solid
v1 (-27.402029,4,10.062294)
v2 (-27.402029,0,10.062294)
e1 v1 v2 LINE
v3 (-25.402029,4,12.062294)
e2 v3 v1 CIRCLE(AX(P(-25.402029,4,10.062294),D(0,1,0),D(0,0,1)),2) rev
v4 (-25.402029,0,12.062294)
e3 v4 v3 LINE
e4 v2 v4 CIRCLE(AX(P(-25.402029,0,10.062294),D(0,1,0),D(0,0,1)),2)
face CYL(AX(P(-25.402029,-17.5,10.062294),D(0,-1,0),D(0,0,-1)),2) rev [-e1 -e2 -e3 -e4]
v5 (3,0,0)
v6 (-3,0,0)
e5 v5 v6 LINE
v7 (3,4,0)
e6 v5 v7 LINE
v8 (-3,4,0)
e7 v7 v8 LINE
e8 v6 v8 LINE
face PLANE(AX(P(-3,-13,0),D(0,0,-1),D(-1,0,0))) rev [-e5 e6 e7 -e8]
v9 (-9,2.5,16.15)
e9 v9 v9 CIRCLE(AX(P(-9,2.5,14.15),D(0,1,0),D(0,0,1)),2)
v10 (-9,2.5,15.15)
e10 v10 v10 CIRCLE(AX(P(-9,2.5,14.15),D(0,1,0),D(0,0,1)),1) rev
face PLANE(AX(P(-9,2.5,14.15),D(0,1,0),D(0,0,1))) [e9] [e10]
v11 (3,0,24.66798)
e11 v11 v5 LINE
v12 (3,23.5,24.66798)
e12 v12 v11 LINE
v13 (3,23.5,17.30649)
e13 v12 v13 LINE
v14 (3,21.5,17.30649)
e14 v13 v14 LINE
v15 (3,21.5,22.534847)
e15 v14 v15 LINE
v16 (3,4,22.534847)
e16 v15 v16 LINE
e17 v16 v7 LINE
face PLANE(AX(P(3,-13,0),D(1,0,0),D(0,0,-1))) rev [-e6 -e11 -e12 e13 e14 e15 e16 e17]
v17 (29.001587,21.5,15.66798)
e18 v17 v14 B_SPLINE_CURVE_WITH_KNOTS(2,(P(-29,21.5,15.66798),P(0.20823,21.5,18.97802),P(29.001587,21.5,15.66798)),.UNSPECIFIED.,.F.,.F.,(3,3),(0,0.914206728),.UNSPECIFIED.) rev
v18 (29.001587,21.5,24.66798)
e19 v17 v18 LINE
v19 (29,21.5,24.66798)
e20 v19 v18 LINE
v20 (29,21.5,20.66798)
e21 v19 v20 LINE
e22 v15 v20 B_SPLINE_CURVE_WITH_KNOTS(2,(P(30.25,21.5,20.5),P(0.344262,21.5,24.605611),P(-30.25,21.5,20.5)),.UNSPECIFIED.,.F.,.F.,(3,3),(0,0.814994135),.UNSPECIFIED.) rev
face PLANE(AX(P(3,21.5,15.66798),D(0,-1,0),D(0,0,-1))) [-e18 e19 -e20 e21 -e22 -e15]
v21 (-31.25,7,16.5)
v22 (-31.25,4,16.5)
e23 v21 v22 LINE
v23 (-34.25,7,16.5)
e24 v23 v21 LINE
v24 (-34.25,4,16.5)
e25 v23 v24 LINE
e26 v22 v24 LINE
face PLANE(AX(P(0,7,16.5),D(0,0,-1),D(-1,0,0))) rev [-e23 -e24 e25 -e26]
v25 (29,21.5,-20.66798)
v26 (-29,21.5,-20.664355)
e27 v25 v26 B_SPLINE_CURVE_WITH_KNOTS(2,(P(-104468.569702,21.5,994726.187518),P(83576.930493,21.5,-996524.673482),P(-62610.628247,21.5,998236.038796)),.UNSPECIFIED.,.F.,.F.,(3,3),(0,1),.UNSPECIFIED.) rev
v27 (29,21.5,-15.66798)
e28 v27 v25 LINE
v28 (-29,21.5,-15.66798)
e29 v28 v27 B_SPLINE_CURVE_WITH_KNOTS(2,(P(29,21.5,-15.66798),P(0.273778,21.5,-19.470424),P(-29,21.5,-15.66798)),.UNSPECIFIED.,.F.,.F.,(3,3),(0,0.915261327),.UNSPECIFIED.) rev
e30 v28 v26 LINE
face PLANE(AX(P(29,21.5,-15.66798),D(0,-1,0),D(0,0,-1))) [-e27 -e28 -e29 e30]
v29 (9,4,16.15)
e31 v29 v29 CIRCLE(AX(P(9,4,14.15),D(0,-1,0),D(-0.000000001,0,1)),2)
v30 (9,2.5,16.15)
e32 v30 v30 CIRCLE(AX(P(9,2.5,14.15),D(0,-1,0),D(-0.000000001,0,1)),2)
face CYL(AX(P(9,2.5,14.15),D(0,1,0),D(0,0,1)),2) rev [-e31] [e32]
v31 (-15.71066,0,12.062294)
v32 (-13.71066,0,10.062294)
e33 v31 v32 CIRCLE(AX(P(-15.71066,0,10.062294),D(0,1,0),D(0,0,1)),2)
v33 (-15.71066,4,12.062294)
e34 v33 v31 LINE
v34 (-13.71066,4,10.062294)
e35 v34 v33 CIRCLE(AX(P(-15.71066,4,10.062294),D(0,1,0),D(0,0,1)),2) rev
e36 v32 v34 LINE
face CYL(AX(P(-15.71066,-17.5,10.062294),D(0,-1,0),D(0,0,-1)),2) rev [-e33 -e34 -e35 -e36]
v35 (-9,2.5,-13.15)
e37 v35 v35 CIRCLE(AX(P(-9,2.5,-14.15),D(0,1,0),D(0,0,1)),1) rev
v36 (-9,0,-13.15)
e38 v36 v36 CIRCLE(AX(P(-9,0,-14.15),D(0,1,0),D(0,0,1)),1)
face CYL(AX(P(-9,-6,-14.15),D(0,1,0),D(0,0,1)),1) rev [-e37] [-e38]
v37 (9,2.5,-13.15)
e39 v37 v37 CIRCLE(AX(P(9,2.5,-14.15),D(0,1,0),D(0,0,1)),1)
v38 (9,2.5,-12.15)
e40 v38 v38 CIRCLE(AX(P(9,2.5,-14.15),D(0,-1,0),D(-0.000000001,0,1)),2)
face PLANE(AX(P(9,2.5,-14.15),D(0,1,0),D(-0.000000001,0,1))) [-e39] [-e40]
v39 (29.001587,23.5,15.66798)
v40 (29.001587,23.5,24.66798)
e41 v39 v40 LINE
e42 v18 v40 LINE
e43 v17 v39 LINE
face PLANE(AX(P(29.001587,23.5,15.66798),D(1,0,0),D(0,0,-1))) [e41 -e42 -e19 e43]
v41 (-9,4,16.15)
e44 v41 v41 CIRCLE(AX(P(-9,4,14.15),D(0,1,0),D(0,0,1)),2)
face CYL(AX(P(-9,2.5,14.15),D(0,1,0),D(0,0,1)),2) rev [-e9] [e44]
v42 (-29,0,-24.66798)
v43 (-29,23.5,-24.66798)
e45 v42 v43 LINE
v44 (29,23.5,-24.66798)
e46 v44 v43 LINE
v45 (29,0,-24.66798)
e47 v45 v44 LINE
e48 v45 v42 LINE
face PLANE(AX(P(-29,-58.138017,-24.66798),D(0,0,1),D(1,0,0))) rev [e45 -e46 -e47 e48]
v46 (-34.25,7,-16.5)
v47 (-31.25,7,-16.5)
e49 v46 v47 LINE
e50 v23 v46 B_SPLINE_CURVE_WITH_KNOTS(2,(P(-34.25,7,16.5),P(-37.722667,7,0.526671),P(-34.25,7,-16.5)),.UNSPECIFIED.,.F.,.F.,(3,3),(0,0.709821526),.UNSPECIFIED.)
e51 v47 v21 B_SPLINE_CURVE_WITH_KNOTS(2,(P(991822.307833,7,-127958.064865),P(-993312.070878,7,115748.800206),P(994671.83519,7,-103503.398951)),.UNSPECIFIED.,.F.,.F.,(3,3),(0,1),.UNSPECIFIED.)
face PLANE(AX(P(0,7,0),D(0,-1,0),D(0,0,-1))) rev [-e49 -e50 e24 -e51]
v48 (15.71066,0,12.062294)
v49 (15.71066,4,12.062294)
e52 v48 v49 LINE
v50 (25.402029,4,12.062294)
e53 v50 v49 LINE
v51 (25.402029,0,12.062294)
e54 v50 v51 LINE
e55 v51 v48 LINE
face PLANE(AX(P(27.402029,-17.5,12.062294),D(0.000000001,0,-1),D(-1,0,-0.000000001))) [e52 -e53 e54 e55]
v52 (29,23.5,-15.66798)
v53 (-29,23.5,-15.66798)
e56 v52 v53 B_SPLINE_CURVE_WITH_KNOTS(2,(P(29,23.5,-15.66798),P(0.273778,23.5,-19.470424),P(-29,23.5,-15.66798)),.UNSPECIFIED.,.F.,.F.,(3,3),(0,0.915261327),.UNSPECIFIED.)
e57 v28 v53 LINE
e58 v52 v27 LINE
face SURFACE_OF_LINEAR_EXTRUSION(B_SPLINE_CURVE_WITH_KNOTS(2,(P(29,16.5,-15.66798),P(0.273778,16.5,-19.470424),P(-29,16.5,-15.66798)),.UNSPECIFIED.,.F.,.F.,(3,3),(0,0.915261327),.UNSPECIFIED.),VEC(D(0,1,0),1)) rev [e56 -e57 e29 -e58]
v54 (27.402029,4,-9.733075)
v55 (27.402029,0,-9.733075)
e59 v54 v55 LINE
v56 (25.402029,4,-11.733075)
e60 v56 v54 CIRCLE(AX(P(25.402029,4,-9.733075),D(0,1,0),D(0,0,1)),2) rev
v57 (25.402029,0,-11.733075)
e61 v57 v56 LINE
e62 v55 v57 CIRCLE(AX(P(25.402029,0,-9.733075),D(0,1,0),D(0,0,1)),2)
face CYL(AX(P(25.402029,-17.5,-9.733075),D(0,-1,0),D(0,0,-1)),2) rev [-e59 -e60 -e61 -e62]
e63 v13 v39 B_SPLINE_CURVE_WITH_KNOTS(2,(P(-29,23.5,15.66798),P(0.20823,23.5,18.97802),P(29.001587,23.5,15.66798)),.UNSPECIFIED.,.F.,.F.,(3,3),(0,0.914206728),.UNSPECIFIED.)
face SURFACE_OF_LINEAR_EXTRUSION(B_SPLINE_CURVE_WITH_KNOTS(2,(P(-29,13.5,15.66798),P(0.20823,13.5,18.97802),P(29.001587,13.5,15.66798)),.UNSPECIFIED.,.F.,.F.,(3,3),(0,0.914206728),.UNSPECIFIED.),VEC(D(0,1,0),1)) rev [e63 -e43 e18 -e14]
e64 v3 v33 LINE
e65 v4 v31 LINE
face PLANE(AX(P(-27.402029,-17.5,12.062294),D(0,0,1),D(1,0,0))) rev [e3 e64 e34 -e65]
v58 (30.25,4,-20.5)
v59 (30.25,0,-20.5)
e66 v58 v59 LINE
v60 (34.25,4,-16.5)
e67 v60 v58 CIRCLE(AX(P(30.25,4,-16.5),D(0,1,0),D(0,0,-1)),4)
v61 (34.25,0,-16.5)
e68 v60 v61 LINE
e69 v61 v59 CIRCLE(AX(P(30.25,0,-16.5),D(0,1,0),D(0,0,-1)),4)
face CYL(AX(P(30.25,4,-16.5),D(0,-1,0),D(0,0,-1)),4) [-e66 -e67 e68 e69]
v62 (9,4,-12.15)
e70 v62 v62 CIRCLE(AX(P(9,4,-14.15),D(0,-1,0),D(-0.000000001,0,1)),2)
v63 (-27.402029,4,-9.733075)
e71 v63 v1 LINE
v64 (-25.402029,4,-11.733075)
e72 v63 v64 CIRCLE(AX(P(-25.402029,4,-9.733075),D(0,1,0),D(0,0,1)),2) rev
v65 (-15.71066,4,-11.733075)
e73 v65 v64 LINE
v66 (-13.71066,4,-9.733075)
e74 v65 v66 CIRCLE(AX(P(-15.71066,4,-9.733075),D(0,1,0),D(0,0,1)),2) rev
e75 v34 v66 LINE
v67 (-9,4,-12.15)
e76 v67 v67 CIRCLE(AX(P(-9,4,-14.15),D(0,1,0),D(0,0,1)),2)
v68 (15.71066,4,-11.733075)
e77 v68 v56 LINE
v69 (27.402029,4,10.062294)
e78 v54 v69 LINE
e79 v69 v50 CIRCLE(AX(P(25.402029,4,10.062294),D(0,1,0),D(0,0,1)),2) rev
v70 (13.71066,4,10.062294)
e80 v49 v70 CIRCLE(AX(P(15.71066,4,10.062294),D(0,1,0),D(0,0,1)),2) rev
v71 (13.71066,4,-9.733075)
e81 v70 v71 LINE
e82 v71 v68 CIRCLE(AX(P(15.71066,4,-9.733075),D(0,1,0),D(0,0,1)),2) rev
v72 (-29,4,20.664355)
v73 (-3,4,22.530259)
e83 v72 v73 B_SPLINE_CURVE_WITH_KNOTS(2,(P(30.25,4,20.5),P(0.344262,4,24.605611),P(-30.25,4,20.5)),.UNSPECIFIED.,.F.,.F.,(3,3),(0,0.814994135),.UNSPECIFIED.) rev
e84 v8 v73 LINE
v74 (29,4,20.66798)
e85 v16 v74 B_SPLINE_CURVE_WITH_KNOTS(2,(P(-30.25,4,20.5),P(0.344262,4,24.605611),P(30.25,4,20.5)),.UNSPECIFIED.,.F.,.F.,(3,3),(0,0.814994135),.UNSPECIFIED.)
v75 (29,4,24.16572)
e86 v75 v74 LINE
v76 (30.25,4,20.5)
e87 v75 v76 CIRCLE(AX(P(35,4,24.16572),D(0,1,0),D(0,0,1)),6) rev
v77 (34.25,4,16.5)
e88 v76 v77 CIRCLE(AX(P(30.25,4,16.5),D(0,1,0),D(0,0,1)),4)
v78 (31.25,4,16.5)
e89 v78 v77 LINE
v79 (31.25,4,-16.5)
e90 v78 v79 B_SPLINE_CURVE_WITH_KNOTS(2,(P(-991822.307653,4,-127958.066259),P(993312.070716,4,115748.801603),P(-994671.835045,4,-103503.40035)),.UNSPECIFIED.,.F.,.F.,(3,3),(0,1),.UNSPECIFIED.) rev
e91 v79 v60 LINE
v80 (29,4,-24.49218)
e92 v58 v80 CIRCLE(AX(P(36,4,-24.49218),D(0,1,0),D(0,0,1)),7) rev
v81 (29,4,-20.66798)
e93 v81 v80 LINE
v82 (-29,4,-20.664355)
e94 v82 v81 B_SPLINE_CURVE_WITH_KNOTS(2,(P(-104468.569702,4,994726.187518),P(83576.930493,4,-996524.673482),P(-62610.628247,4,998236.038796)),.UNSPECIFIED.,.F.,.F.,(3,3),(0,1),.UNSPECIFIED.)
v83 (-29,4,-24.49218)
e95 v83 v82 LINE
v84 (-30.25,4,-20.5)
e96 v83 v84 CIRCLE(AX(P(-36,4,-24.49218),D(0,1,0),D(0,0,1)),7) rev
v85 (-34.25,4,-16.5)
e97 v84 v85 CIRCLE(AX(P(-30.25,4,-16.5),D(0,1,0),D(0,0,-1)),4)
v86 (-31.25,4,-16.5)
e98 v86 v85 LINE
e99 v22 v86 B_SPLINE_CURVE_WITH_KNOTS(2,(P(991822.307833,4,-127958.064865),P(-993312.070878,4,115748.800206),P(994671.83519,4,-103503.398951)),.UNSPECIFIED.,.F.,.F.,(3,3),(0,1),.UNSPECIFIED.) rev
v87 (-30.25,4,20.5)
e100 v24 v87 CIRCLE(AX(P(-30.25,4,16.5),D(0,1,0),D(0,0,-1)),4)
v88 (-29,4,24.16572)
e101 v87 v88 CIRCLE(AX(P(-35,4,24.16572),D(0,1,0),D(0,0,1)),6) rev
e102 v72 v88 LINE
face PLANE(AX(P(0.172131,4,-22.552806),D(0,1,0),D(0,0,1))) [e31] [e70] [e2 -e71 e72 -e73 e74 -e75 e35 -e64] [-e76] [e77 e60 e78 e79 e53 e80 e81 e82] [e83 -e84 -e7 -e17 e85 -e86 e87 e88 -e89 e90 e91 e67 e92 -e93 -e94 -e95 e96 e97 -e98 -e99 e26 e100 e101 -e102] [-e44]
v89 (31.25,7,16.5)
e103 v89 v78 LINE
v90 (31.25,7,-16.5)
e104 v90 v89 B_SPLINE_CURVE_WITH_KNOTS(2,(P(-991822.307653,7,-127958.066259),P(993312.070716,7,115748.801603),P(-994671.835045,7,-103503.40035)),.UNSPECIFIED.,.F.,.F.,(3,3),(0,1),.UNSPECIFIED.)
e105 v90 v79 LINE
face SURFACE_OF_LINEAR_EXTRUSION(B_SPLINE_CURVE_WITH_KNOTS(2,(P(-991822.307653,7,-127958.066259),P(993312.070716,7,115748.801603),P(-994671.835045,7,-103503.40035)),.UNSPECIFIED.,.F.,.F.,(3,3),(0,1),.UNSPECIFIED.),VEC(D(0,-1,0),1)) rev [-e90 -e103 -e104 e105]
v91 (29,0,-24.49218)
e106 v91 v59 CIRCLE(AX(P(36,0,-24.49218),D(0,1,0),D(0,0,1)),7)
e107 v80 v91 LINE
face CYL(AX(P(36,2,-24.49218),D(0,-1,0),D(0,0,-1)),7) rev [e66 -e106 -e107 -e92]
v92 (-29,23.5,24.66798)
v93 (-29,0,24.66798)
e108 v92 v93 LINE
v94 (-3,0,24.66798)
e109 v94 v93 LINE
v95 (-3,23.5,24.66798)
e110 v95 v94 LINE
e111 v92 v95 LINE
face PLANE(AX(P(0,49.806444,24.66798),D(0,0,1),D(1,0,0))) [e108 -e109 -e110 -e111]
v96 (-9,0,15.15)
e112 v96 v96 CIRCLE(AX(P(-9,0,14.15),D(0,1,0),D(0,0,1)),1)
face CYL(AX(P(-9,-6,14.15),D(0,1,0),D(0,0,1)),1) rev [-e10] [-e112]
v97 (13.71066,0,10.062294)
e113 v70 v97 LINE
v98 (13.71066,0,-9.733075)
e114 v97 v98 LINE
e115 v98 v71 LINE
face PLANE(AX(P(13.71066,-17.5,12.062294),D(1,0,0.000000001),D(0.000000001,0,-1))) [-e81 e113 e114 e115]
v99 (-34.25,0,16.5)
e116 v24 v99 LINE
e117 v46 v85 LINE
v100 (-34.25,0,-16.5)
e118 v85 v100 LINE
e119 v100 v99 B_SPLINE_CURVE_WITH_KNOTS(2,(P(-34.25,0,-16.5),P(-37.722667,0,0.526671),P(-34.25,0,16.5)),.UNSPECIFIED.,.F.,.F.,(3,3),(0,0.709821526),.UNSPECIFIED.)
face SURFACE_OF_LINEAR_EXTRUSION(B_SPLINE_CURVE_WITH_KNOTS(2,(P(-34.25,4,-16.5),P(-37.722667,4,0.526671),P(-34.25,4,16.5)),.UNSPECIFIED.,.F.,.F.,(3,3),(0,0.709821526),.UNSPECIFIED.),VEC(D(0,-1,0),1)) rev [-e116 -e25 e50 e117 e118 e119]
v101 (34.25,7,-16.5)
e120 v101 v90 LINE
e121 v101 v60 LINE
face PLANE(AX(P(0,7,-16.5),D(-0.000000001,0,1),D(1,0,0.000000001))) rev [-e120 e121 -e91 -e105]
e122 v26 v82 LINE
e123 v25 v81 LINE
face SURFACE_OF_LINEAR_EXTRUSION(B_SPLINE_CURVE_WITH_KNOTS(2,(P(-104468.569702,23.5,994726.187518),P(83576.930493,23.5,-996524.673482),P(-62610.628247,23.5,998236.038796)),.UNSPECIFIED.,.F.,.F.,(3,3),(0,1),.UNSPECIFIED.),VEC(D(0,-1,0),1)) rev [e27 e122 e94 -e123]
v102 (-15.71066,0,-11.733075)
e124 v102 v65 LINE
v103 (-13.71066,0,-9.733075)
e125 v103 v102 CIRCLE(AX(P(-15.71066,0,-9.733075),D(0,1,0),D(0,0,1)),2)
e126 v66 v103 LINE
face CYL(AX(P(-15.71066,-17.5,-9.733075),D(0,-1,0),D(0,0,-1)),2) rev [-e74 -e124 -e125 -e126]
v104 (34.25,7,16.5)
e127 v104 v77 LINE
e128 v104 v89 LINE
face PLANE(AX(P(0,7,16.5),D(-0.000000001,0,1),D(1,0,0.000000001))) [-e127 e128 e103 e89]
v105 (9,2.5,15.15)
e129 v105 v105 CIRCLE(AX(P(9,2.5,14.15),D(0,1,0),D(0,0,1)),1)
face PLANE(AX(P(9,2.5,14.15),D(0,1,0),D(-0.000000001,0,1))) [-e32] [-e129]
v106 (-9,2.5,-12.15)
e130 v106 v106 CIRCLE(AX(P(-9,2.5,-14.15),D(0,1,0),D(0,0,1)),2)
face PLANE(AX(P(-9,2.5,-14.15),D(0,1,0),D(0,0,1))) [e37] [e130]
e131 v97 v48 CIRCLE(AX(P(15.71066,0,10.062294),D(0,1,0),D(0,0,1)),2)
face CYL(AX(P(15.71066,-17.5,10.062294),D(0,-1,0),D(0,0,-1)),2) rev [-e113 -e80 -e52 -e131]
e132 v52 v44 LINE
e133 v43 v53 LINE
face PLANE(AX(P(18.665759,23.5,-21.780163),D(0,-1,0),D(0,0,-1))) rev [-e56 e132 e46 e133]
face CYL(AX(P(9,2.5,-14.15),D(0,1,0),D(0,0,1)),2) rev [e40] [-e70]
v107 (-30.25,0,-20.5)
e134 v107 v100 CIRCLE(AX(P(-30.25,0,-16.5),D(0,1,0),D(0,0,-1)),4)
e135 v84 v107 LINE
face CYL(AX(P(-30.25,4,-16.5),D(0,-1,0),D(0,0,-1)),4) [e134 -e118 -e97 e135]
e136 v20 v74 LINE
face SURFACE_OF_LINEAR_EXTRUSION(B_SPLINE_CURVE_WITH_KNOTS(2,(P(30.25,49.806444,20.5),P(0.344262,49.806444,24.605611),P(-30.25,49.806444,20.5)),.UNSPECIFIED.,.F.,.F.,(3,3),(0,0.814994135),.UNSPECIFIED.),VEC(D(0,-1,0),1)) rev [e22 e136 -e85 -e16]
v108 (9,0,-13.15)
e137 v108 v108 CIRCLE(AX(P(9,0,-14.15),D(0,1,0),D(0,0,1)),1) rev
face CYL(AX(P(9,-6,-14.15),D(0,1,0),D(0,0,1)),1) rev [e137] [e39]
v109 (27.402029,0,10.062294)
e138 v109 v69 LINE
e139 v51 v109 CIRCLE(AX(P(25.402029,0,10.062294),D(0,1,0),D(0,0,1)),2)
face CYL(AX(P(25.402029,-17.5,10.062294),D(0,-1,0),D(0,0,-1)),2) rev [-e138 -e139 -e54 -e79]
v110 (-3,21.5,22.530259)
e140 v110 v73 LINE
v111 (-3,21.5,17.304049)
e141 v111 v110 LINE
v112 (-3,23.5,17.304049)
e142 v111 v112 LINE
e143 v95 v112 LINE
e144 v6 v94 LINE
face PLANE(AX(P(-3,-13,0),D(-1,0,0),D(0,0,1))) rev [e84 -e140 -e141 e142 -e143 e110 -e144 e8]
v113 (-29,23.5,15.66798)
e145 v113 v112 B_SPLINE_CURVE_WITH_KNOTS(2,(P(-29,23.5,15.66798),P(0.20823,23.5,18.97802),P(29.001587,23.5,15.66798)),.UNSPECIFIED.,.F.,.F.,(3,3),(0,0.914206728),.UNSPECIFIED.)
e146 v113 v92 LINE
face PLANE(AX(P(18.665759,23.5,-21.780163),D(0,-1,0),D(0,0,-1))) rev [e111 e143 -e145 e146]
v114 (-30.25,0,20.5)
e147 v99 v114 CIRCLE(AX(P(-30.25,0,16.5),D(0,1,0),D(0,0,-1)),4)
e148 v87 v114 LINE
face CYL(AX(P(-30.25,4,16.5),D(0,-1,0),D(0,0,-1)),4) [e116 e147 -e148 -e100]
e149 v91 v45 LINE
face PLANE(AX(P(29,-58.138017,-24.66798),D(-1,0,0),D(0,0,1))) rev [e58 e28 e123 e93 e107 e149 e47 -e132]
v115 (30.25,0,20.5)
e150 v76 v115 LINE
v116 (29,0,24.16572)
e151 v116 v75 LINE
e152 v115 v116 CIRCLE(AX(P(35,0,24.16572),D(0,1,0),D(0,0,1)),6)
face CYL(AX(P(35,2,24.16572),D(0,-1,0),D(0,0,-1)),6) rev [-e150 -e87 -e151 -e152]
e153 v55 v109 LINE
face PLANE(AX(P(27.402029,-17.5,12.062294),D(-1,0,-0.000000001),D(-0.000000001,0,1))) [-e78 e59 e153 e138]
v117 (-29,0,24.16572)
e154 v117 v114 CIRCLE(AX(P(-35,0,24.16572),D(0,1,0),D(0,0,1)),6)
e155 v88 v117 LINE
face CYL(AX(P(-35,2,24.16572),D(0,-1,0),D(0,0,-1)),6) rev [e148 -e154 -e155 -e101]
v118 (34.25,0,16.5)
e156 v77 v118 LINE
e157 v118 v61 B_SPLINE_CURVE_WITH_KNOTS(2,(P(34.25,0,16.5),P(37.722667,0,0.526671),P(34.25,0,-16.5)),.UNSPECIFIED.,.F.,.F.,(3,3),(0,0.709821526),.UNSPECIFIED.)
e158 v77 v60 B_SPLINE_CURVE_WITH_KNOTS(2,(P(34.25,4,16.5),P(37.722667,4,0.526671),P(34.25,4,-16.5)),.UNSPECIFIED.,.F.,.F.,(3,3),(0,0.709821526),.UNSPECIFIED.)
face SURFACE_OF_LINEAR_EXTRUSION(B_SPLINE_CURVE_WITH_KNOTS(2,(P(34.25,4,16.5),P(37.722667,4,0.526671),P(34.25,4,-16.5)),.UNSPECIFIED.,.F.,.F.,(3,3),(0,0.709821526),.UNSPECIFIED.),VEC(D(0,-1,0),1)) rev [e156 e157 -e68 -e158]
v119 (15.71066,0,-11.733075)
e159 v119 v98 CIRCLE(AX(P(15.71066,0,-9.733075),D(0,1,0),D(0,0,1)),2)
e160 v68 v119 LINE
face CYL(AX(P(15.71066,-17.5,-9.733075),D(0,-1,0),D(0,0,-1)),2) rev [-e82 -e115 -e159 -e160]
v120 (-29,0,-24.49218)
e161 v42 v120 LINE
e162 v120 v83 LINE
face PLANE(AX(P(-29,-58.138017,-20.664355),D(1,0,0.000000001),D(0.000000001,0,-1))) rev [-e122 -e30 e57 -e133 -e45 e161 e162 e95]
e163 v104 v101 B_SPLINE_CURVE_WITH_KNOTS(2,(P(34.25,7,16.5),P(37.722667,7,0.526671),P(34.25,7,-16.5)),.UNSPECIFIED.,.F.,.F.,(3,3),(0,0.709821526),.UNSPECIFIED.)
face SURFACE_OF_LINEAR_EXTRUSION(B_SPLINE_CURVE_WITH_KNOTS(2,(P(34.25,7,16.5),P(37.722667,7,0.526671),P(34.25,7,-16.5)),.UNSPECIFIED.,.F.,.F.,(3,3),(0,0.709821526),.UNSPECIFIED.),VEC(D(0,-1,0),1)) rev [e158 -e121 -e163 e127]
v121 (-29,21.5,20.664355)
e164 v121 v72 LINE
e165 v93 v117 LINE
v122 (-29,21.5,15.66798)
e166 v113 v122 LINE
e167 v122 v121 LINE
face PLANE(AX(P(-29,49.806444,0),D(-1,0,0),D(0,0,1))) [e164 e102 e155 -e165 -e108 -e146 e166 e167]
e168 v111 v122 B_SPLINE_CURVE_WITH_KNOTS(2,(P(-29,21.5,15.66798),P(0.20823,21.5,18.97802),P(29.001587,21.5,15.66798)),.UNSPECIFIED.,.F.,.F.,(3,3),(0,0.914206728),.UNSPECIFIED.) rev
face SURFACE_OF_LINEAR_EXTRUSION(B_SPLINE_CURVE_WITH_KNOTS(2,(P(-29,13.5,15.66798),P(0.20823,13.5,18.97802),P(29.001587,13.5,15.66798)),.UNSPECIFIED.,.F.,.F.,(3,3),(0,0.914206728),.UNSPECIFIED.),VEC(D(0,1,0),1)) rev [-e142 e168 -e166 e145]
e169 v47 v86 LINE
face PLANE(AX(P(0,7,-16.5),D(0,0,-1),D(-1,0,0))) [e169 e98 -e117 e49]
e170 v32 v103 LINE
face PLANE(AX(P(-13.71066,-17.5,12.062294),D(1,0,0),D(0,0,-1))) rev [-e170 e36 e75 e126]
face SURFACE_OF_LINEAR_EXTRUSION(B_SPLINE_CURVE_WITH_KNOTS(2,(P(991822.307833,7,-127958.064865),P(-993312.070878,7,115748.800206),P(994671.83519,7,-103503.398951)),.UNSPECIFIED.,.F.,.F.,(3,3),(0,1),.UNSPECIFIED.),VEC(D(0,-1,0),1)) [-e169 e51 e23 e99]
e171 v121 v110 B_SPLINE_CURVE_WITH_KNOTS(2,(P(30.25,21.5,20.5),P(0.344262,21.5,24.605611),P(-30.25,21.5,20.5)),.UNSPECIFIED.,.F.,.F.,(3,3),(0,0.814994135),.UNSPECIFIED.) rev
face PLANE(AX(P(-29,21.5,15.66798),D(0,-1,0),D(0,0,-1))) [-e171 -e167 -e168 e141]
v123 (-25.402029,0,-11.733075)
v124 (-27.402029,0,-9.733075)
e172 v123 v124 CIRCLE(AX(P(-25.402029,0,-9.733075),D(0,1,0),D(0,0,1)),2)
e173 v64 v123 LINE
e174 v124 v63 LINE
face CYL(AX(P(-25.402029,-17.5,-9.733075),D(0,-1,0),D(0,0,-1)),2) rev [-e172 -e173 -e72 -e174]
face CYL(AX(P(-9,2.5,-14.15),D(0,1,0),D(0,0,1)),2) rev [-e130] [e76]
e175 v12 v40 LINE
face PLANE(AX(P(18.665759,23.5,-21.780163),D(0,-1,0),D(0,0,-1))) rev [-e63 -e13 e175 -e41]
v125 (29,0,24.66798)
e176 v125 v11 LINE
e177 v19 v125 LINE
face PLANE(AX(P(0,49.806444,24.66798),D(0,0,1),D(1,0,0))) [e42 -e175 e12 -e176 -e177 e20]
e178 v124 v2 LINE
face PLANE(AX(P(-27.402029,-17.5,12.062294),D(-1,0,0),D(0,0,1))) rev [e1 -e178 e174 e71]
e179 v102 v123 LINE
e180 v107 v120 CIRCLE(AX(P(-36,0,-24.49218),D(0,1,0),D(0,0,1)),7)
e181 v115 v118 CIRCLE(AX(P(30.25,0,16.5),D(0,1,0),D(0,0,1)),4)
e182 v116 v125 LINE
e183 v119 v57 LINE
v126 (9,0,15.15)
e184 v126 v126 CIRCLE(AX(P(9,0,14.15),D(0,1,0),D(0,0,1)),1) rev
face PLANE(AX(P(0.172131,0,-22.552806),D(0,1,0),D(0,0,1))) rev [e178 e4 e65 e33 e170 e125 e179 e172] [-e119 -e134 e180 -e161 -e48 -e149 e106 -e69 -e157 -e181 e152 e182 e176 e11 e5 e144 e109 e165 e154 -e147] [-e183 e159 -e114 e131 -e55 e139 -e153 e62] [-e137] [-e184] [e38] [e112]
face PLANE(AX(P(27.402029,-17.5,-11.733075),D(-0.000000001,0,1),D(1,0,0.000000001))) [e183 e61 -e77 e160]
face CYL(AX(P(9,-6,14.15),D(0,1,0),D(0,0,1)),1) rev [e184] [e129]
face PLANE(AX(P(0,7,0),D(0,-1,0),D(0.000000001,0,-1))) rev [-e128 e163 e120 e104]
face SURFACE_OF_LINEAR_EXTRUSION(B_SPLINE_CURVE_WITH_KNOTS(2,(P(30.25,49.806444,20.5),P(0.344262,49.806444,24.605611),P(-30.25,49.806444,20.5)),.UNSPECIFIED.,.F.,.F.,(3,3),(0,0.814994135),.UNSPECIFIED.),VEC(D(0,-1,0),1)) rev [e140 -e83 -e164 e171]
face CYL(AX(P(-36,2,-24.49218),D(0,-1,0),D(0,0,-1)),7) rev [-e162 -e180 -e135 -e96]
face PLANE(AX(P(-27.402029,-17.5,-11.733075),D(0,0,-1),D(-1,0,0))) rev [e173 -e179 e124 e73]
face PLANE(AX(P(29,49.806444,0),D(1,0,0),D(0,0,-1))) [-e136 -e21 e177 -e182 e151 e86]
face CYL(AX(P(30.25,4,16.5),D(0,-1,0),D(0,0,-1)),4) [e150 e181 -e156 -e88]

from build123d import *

# Parameters (mm, degrees)
BOSS_EXTRUDE1_DEPTH   = 4
CUT_EXTRUDE1_DEPTH    = 17
BOSS_EXTRUDE2_DEPTH   = 19.5
BOSS_EXTRUDE3_DEPTH   = 4
SKETCH6_W             = 58
SKETCH6_H             = 2
BOSS_EXTRUDE4_DEPTH   = 9
CUT_EXTRUDE2_DEPTH    = 7
FILLET1_R             = 7
BOSS_EXTRUDE5_DEPTH   = 23.5
SKETCH9_W             = 26
SKETCH9_H             = 2
SKETCH9_W_2           = 26.001587477
BOSS_EXTRUDE6_DEPTH   = 9
CUT_EXTRUDE3_DEPTH    = 10
SKETCH11_R            = 1
CUT_EXTRUDE4_DEPTH    = 10
SKETCH12_R            = 2
CUT_EXTRUDE5_DEPTH    = 1.5
SKETCH13_W            = 13.69136931
SKETCH13_H            = 23.795369164
CUT_EXTRUDE6_DEPTH    = 21.5
FILLET2_R             = 2
FILLET2_OF_MIRROR11_R = 2
FILLET3_R             = 6
BOSS_EXTRUDE7_DEPTH   = 7


with BuildPart() as part:
    # Sketch1 → Boss-Extrude1 (new body)
    with BuildSketch(Plane(origin=(0, 0, 0), x_dir=(1, 0, 0), z_dir=(0, 1, 0))):
        with BuildLine():
            ThreePointArc((30.25, 20.5), (33.078427125, 19.328427125), (34.25, 16.5))
            add(Edge.make_bspline(
                [(34.25, 16.5), (37.722666951, -0.526670932), (34.25, -16.5)],
                knots=[0, 0, 0, 0.709821526, 0.709821526, 0.709821526], degree=2))
            ThreePointArc((34.25, -16.5), (33.078427125, -19.328427125), (30.25, -20.5))
            add(Edge.make_bspline(
                [(-30.25, -20.5), (0.344261678, -24.605611324), (30.25, -20.5)],
                knots=[0, 0, 0, 0.814994135, 0.814994135, 0.814994135], degree=2))
            ThreePointArc((-30.25, -20.5), (-33.078427125, -19.328427125), (-34.25, -16.5))
            add(Edge.make_bspline(
                [(-34.25, 16.5), (-37.722666951, -0.526670933), (-34.25, -16.5)],
                knots=[0, 0, 0, 0.709821526, 0.709821526, 0.709821526], degree=2))
            ThreePointArc((-34.25, 16.5), (-33.078427125, 19.328427125), (-30.25, 20.5))
            add(Edge.make_bspline(
                [(-30.25, 20.5), (0.344261678, 24.605611324), (30.25, 20.5)],
                knots=[0, 0, 0, 0.814994135, 0.814994135, 0.814994135], degree=2))
        make_face()
    extrude(amount=BOSS_EXTRUDE1_DEPTH)

    # Sketch2 → Cut-Extrude1 (cut)
    with BuildSketch(Plane(origin=(0, 4, 0), x_dir=(1, 0, 0), z_dir=(0, 1, 0))):
        with BuildLine():
            Line((-3, 0), (-3, -22.530259042))
            add(Edge.make_bspline(
                [(-3, -22.530259042), (0.003385515, -22.572928062), (3, -22.534846829)],
                knots=[0, 0, 0, 1, 1, 1], degree=2))
            Line((3, -22.534846829), (3, 0))
            Line((3, 0), (-3, 0))
        make_face()
    extrude(amount=-CUT_EXTRUDE1_DEPTH, mode=Mode.SUBTRACT)



with BuildPart() as body_2:
    # Sketch3 → Boss-Extrude2 (new body)
    with BuildSketch(Plane(origin=(0, 4, 0), x_dir=(1, 0, 0), z_dir=(0, 1, 0))):
        with BuildLine():
            Line((-29, 20.664354546), (-29, 24.667980394))
            Line((-29, 24.667980394), (29, 24.667980394))
            Line((29, 24.667980394), (29, 20.667980394))
            add(Edge.make_bspline(
                [(29, 20.667980394), (0.316394821, 24.439442983), (-29, 20.664354546)],
                knots=[0, 0, 0, 1, 1, 1], degree=2))
        make_face()
    extrude(amount=BOSS_EXTRUDE2_DEPTH)


with BuildPart() as part_1:
    add(part.part)

    add(body_2.part)  # Boss-Extrude3 merges body 2
    # Sketch4 → Boss-Extrude3 (add)
    with BuildSketch(Plane.XZ.offset(-4)):
        with BuildLine():
            Line((-29.000000006, -20.664354545), (-29, -24.667980394))
            Line((-29, -24.667980394), (29, -24.667980394))
            Line((29, -24.667980394), (29, -20.667980394))
            add(Edge.make_bspline(
                [(29, -20.667980394), (0.316394818, -24.439442983), (-29.000000006, -20.664354545)],
                knots=[0, 0, 0, 1, 1, 1], degree=2))
        make_face()
    extrude(amount=BOSS_EXTRUDE3_DEPTH)

    # Sketch6 → Boss-Extrude4 (add)
    with BuildSketch(Plane(origin=(0, 0, -24.667980394), x_dir=(-1, 0, 0), z_dir=(0, 0, -1))):
        with Locations((0, 22.5)):
            Rectangle(SKETCH6_W, SKETCH6_H)
    extrude(amount=-BOSS_EXTRUDE4_DEPTH)

    # Sketch7 → Cut-Extrude2 (cut)
    with BuildSketch(Plane(origin=(0, 23.5, 0), x_dir=(1, 0, 0), z_dir=(0, 1, 0))):
        with BuildLine():
            Line((-29, 15.667980394), (29, 15.667980394))
            add(Edge.make_bspline(
                [(-29, 15.667980394), (0.2737777, 19.470424078), (29, 15.667980394)],
                knots=[0, 0, 0, 0.915261327, 0.915261327, 0.915261327], degree=2))
        make_face()
    extrude(amount=-CUT_EXTRUDE2_DEPTH, mode=Mode.SUBTRACT)

    # Fillet1
    # the kernel refuses this fillet: 7 mm, written as the material it adds along each edge
    with BuildSketch(Plane(origin=(-29.000000006, 4, -20.664354545), x_dir=(-0.9914665134907249, 0, 0.13036162252191422), z_dir=(0, -1, 0))) as fillet1_piece_1:
        with BuildLine():
            CenterArc((6.441264071, 4.707691972), FILLET1_R, 187.490489673, 34.771943947)
            Line((-0.499001522, 3.795160604), (-0.637806834, 3.776909977))
            Line((-0.637806834, 3.776909977), (-0.138805312, -0.018250627))
            Line((-0.138805312, -0.018250627), (0.000373506, -0.139999502))
            ThreePointArc((0.000373506, -0.139999502), (0.630379223, -0.139159591), (1.157148553, -0.094153839))
            Line((1.157148553, -0.094153839), (1.260758661, 0))
        make_face()
    extrude(amount=4)
    with BuildSketch(Plane(origin=(29, 4, -20.667980394), x_dir=(0.9910909157815452, 0, 0.13318707390470766), z_dir=(0, -1, 0))) as fillet1_piece_2:
        with BuildLine():
            CenterArc((6.428302474, -4.722438864), FILLET1_R, 137.57425577, 34.771944029)
            Line((-0.509333936, -3.790129346), (-0.648086665, -3.771483156))
            Line((-0.648086665, -3.771483156), (-0.138752728, 0.01864619))
            Line((-0.138752728, 0.01864619), (0.000398861, 0.139999432))
            ThreePointArc((0.000398861, 0.139999432), (0.630618203, 0.139101807), (1.157895141, 0.094448777))
            Line((1.157895141, 0.094448777), (1.261236462, 0))
        make_face()
    extrude(amount=4)

    # Sketch8 → Boss-Extrude5 (add)
    with BuildSketch(Plane.XZ):
        with BuildLine():
            add(Edge.make_bspline(
                [(2.999999846, 22.534846831), (16.064348435, 22.368823982), (29, 20.667980394)],
                knots=[0, 0, 0, 0.953900197, 0.953900197, 0.953900197], degree=2))
            Line((29, 20.667980394), (29, 24.667980394))
            Line((29, 24.667980394), (2.999999846, 24.667980394))
            Line((2.999999846, 24.667980394), (2.999999846, 22.534846831))
        make_face()
        with BuildLine():
            Line((-3, 24.667980394), (-29, 24.667980394))
            Line((-29, 24.667980394), (-29, 20.664354545))
            add(Edge.make_bspline(
                [(-29, 20.664354545), (-15.937182308, 22.346460832), (-3, 22.530259042)],
                knots=[0.045651019, 0.045651019, 0.045651019, 1, 1, 1], degree=2))
            Line((-3, 22.530259042), (-3, 24.667980394))
        make_face()
    extrude(amount=-BOSS_EXTRUDE5_DEPTH)

    # Sketch9 → Boss-Extrude6 (add)
    with BuildSketch(Plane.XY.offset(24.667980394)):
        with Locations((-16, 22.5)):
            Rectangle(SKETCH9_W, SKETCH9_H)
        with Locations((16.000793585, 22.5)):
            Rectangle(SKETCH9_W_2, SKETCH9_H)
    extrude(amount=-BOSS_EXTRUDE6_DEPTH)

    # Sketch10 → Cut-Extrude3 (cut)
    with BuildSketch(Plane(origin=(0, 23.5, 0), x_dir=(1, 0, 0), z_dir=(0, 1, 0))):
        with BuildLine():
            Line((-29, -15.667980394), (29.001587323, -15.667980394))
            add(Edge.make_bspline(
                [(-29, -15.667980394), (0.20822973, -18.978019575), (29.001587323, -15.667980394)],
                knots=[0, 0, 0, 0.914206728, 0.914206728, 0.914206728], degree=2))
        make_face()
    extrude(amount=-CUT_EXTRUDE3_DEPTH, mode=Mode.SUBTRACT)

    # Sketch11 → Cut-Extrude4 (cut)
    with BuildSketch(Plane(origin=(0, 4, 0), x_dir=(1, 0, 0), z_dir=(0, 1, 0))):
        with Locations(Location((-9, 14.15, 0), (0, 0, 270))):
            Circle(SKETCH11_R)
        with Locations(Location((-9, -14.15, 0), (0, 0, 270))):
            Circle(SKETCH11_R)
    cut_extrude4 = extrude(amount=-CUT_EXTRUDE4_DEPTH, mode=Mode.SUBTRACT)

    # Sketch12 → Cut-Extrude5 (cut)
    with BuildSketch(Plane(origin=(0, 4, 0), x_dir=(1, 0, 0), z_dir=(0, 1, 0))):
        with Locations(Location((-9, 14.15, 0), (0, 0, 270))):
            Circle(SKETCH12_R)
        with Locations(Location((-9, -14.15, 0), (0, 0, 270))):
            Circle(SKETCH12_R)
    cut_extrude5 = extrude(amount=-CUT_EXTRUDE5_DEPTH, mode=Mode.SUBTRACT)

    # Mirror10: Cut-Extrude4, Cut-Extrude5 across plane
    add(cut_extrude4.mirror(Plane.ZY), mode=Mode.SUBTRACT)
    add(cut_extrude5.mirror(Plane.ZY), mode=Mode.SUBTRACT)

    # Sketch13 → Cut-Extrude6 (cut)
    with BuildSketch(Plane(origin=(0, 4, 0), x_dir=(1, 0, 0), z_dir=(0, 1, 0))):
        with Locations((-20.556344598, -0.164609633)):
            Rectangle(SKETCH13_W, SKETCH13_H)
    cut_extrude6 = extrude(amount=-CUT_EXTRUDE6_DEPTH, mode=Mode.SUBTRACT)

    # Fillet2
    fillet2_edges = [part_1.edges().sort_by_distance(p)[0] for p in [
        (-13.710659943, 2, -11.733074949),
        (-13.710659943, 2, 12.062294215),
        (-27.402029253, 2, 12.062294215),
        (-27.402029253, 2, -11.733074949),
    ]]
    fillet(fillet2_edges, radius=FILLET2_R)

    # Mirror11: Cut-Extrude6 across plane
    add(cut_extrude6.mirror(Plane.ZY), mode=Mode.SUBTRACT)

    # Fillet2 of Mirror11
    fillet2_of_mirror11_edges = [part_1.edges().sort_by_distance(p)[0] for p in [
        (13.710659959, 2, -11.73307493),
        (13.710659926, 2, 12.062294234),
        (27.402029236, 2, 12.062294253),
        (27.40202927, 2, -11.733074911),
    ]]
    fillet(fillet2_of_mirror11_edges, radius=FILLET2_OF_MIRROR11_R)

    # Fillet3
    # the kernel refuses this fillet: 6 mm, written as the material it adds along each edge
    with BuildSketch(Plane(origin=(-29, 0, 20.664354545), x_dir=(-0.9914665134873252, 0, -0.13036162254777076), z_dir=(0, 1, 0))) as fillet3_piece_1:
        with BuildLine():
            CenterArc((5.492355455, 4.253655913), FILLET3_R, 187.490489592, 37.658462004)
            Line((-0.456443626, 3.471486178), (-0.575419608, 3.455842783))
            Line((-0.575419608, 3.455842783), (-0.118975982, -0.015643395))
            Line((-0.118975982, -0.015643395), (0.000320148, -0.119999573))
            ThreePointArc((0.000320148, -0.119999573), (0.630379241, -0.119159591), (1.176126731, -0.085073118))
            Line((1.176126731, -0.085073118), (1.260758667, 0))
        make_face()
    extrude(amount=4)
    with BuildSketch(Plane(origin=(29, 0, 20.667980394), x_dir=(0.9910909157697056, 0, -0.1331870739928102), z_dir=(0, 1, 0))) as fillet3_piece_2:
        with BuildLine():
            CenterArc((5.480691848, -4.265699972), FILLET3_R, 134.68773779, 37.658462005)
            Line((-0.465853647, -3.466577528), (-0.584784557, -3.450595079))
            Line((-0.584784557, -3.450595079), (-0.11893091, 0.015982449))
            Line((-0.11893091, 0.015982449), (0.000341881, 0.119999513))
            ThreePointArc((0.000341881, 0.119999513), (0.630618207, 0.119101807), (1.176847354, 0.085313999))
            Line((1.176847354, 0.085313999), (1.261236462, 0))
        make_face()
    extrude(amount=4)

    # Sketch14 → Boss-Extrude7 (add)
    with BuildSketch(Plane.XZ):
        with BuildLine():
            Line((-31.25, 16.5), (-34.25, 16.5))
            add(Edge.make_bspline(
                [(-34.25, -16.5), (-37.722666951, 0.526670933), (-34.25, 16.5)],
                knots=[0, 0, 0, 1, 1, 1], degree=2))
            Line((-34.25, -16.5), (-31.25, -16.5))
            add(Edge.make_bspline(
                [(-31.25, -16.5), (-34.771209982, 0.410301421), (-31.25, 16.5)],
                knots=[0, 0, 0, 1, 1, 1], degree=2))
        make_face()
    boss_extrude7 = extrude(amount=-BOSS_EXTRUDE7_DEPTH)

    # Mirror12: Boss-Extrude7 across plane
    add(boss_extrude7.mirror(Plane.ZY))


solid = part_1.part
